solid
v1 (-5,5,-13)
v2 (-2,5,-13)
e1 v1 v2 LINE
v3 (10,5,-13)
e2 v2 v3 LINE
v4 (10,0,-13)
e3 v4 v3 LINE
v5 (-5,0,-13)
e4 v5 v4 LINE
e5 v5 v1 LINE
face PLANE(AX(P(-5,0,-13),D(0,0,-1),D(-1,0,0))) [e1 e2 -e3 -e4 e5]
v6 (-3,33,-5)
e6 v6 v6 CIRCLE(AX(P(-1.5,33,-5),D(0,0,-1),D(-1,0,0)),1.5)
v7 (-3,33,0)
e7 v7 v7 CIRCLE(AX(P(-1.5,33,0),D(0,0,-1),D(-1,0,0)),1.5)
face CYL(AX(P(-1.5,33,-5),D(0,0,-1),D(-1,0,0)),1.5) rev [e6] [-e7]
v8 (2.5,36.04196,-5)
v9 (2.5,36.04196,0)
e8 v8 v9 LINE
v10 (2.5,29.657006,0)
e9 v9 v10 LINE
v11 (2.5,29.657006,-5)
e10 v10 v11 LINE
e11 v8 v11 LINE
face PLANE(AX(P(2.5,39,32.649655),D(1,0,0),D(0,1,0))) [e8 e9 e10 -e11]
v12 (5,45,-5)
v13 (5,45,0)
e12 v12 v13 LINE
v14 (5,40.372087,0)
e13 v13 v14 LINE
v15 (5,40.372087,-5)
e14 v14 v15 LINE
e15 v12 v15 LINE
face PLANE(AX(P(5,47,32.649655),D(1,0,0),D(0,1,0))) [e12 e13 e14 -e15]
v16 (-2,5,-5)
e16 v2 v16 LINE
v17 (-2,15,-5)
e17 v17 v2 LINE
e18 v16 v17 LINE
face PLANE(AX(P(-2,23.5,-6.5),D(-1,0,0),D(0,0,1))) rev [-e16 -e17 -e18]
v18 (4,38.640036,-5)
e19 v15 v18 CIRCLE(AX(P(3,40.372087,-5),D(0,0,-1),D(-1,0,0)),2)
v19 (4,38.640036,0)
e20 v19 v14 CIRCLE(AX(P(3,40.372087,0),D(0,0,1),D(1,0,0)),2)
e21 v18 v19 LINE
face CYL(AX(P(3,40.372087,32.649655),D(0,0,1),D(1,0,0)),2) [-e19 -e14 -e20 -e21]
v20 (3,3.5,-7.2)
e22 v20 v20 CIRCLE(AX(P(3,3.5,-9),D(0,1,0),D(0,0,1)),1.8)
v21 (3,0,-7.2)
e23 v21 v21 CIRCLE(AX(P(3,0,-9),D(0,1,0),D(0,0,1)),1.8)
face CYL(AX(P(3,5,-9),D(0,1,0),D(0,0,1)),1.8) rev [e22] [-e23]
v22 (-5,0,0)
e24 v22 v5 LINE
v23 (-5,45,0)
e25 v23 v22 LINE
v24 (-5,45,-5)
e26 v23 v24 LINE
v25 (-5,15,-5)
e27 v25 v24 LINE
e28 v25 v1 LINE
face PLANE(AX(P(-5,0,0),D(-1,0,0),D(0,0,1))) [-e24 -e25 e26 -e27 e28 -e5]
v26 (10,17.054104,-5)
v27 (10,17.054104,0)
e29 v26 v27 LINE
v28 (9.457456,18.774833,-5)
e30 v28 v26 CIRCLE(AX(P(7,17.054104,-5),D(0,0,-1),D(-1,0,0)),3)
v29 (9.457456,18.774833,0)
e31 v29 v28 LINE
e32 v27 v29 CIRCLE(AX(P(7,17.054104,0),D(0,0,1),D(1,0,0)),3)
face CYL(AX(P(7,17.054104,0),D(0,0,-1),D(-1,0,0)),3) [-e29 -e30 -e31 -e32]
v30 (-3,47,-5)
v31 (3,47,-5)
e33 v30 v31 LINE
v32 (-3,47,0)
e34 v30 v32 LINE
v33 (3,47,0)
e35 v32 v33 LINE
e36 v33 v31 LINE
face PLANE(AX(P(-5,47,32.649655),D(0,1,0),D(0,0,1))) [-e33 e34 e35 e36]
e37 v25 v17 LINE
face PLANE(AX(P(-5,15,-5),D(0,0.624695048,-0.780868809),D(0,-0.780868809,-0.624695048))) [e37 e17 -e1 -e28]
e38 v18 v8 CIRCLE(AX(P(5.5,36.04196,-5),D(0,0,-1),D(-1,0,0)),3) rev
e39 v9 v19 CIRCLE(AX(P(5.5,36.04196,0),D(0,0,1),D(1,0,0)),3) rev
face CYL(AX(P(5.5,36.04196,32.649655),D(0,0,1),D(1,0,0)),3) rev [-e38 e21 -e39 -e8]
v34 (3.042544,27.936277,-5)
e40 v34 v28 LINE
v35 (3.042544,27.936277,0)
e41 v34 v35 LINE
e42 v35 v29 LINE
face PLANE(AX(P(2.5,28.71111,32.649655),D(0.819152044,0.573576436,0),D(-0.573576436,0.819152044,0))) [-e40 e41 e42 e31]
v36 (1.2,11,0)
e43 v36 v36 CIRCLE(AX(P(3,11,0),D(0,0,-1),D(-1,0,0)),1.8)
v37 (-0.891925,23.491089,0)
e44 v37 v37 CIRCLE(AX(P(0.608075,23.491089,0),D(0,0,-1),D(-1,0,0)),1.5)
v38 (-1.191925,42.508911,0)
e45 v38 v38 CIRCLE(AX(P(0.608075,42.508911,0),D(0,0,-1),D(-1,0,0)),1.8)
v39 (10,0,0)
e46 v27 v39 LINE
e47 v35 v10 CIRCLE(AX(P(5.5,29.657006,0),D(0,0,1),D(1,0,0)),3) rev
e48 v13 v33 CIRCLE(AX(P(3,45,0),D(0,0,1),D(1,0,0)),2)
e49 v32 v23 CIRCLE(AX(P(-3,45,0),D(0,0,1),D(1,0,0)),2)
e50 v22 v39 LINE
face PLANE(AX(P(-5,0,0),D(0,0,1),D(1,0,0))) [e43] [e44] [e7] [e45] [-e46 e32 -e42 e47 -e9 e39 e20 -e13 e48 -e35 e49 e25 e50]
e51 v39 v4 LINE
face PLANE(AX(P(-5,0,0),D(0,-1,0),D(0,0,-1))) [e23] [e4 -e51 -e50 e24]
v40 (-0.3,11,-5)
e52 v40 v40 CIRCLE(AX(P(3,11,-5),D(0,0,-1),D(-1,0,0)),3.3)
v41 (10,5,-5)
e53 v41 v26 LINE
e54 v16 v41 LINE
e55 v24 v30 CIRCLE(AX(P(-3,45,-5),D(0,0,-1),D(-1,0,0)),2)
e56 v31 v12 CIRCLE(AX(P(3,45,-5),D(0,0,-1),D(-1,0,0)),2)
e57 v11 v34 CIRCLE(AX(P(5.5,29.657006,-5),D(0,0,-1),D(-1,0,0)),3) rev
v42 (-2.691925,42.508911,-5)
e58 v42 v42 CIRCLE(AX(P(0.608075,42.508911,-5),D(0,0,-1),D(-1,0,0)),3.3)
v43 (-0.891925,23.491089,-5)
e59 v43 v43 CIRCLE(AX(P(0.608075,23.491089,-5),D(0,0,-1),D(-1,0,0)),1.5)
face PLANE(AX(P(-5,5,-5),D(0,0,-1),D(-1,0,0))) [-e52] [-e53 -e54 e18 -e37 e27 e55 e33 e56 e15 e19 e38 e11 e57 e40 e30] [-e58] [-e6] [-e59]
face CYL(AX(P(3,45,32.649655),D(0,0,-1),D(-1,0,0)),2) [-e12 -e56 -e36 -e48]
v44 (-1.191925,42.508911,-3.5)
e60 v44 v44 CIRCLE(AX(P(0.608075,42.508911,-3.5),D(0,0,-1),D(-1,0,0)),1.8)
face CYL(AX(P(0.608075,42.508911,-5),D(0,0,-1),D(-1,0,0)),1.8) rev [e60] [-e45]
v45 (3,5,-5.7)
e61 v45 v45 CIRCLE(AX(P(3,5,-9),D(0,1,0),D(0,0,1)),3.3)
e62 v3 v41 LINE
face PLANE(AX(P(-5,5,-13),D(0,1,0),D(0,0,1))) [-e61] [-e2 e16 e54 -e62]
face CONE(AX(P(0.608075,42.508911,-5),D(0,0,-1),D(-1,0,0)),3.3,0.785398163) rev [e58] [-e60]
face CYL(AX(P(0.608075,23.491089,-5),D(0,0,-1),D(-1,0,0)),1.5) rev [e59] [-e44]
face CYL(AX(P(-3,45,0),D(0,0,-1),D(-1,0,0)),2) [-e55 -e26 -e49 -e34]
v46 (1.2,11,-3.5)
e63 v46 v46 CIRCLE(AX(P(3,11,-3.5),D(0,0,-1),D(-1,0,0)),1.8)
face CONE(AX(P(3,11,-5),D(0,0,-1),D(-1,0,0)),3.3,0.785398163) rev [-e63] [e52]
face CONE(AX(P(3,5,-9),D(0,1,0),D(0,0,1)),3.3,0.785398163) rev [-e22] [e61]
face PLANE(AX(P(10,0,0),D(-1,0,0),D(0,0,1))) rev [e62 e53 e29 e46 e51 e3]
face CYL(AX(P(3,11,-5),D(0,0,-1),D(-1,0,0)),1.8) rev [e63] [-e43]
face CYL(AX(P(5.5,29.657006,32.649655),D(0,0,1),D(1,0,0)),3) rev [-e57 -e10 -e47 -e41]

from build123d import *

# Parameters (mm, degrees)
EXTRUDE_1_DEPTH           = 10
EXTRUDE_1_DEPTH_BACK      = 5
EXTRUDE_2_DEPTH           = 5
RIB_4_REACH               = 54.517
SKETCH_2_WALL_W           = 119.839576518
SKETCH_2_WALL_H           = 3
HOLE_WIZARD_1_D           = 3.6
HOLE_WIZARD_1_CSINK_D     = 6.6
HOLE_WIZARD_1_CSINK_ANGLE = 90
MM_TRANSITIONAL_1_D       = 3
FILLET_1_R                = 3
FILLET_2_R                = 2
HOLE_WIZARD_2_D           = 3.6
HOLE_WIZARD_2_CSINK_D     = 6.6
HOLE_WIZARD_2_CSINK_ANGLE = 90


with BuildPart() as part:
    # 草图1 → 凸台-拉伸1 (new, two sides: drawn at the far end of the back side and taken through both)
    with BuildSketch(Plane(origin=(0, 0, 0), x_dir=(0, 0, -1), z_dir=(1, 0, 0)).offset(-EXTRUDE_1_DEPTH_BACK)):
        Polygon((13, 5), (5, 5), (5, 18), (0, 18), (0, 0), (13, 0), align=None)
    extrude(amount=EXTRUDE_1_DEPTH + EXTRUDE_1_DEPTH_BACK)

    # 草图3 → 凸台-拉伸2 (add)
    with BuildSketch(Plane(origin=(-10, 0, -5), x_dir=(-1, 0, 0), z_dir=(0, 0, -1))):
        Polygon((-5, 18), (-5, 47), (-15, 47), (-15, 39), (-12.5, 39), (-12.5, 28.711110051), (-20, 18), align=None)
    extrude(amount=-EXTRUDE_2_DEPTH)

    # 草图2 wall → 筋4 (add, up to next)
    with BuildSketch(Plane(origin=(-5, 10, -9), x_dir=(0, -0.780868809443, -0.624695047554), z_dir=(0, -0.624695047554, 0.780868809443)), mode=Mode.PRIVATE) as rib_4_sk1:
        with Locations((0, 1.5)):
            Rectangle(SKETCH_2_WALL_W, SKETCH_2_WALL_H)
    rib_4_tool1 = extrude(rib_4_sk1.sketch, amount=RIB_4_REACH, mode=Mode.PRIVATE) - part.part
    add(rib_4_tool1.solids().sort_by_distance((-5, 10, -9))[0])

    # 打孔尺寸(%根据十字)槽半沉头木螺钉的类型1 (through all)
    with Locations(Plane(origin=(0, 0, -5), x_dir=(-1, 0, 0), z_dir=(0, 0, -1))):
        with Locations((-3, 11), (-0.608074792, 42.508910889)):
            CounterSinkHole(HOLE_WIZARD_1_D / 2, HOLE_WIZARD_1_CSINK_D / 2, counter_sink_angle=HOLE_WIZARD_1_CSINK_ANGLE)

    # 大小mm Transitional 暗销孔1 (through all)
    with Locations(Plane(origin=(0, 0, -5), x_dir=(-1, 0, 0), z_dir=(0, 0, -1))):
        with Locations((1.5, 33), (-0.608074792, 23.491089111)):
            Hole(MM_TRANSITIONAL_1_D / 2)

    # 圆角1
    # the kernel refuses this fillet: 3 mm, written as the material it adds along each edge
    with BuildSketch(Plane(origin=(2.5, 28.711110051, -5), x_dir=(0.5735764363510514, -0.8191520442889881, 0), z_dir=(0, 0, 1))) as fillet_1_piece_1:
        with BuildLine():
            CenterArc((FILLET_1_R * 0.315298788879, FILLET_1_R), FILLET_1_R, 235, 35)
            Line((-FILLET_1_R * 0.258277647472, FILLET_1_R * 0.180847955711), (0, 0))
            Line((0, 0), (FILLET_1_R * 0.315298788879, 0))
        make_face()
    extrude(amount=5)
    with BuildSketch(Plane(origin=(2.5, 39, -5), x_dir=(0, -1, 0), z_dir=(0, 0, 1))) as fillet_1_piece_2:
        with BuildLine():
            CenterArc((2.958039892, 3), FILLET_1_R, 189.594068227, 80.405931773)
            Line((0, 2.5), (0, 0))
            Line((0, 0), (2.958039892, 0))
        make_face()
    extrude(amount=5)
    # the kernel refuses this fillet: 3 mm, written as the material it takes off along each edge
    with BuildSketch(Plane(origin=(10, 18, -7.364740917), x_dir=(0, -1, 0), z_dir=(0, 0, 1))) as fillet_1_2_piece_1:
        with BuildLine():
            CenterArc((FILLET_1_R * 0.315298788879, -FILLET_1_R), FILLET_1_R, 90, 35)
            Line((-FILLET_1_R * 0.258277647472, -FILLET_1_R * 0.180847955711), (0, 0))
            Line((0, 0), (FILLET_1_R * 0.315298788879, 0))
        make_face()
    extrude(amount=9.729481833, mode=Mode.SUBTRACT)

    # 圆角2
    fillet_2_edges = [part.edges().sort_by_distance(p)[0] for p in [
        (-5, 47, -2.5),
        (5, 47, -2.5),
        (5, 39, -2.5),
    ]]
    fillet(fillet_2_edges, radius=FILLET_2_R)

    # 打孔尺寸(%根据十字)槽半沉头木螺钉的类型2 (through all)
    with Locations(Plane(origin=(0, 5, 0), x_dir=(1, 0, 0), z_dir=(0, 1, 0))):
        with Locations((3, 9)):
            CounterSinkHole(HOLE_WIZARD_2_D / 2, HOLE_WIZARD_2_CSINK_D / 2, counter_sink_angle=HOLE_WIZARD_2_CSINK_ANGLE)


solid = part.part
